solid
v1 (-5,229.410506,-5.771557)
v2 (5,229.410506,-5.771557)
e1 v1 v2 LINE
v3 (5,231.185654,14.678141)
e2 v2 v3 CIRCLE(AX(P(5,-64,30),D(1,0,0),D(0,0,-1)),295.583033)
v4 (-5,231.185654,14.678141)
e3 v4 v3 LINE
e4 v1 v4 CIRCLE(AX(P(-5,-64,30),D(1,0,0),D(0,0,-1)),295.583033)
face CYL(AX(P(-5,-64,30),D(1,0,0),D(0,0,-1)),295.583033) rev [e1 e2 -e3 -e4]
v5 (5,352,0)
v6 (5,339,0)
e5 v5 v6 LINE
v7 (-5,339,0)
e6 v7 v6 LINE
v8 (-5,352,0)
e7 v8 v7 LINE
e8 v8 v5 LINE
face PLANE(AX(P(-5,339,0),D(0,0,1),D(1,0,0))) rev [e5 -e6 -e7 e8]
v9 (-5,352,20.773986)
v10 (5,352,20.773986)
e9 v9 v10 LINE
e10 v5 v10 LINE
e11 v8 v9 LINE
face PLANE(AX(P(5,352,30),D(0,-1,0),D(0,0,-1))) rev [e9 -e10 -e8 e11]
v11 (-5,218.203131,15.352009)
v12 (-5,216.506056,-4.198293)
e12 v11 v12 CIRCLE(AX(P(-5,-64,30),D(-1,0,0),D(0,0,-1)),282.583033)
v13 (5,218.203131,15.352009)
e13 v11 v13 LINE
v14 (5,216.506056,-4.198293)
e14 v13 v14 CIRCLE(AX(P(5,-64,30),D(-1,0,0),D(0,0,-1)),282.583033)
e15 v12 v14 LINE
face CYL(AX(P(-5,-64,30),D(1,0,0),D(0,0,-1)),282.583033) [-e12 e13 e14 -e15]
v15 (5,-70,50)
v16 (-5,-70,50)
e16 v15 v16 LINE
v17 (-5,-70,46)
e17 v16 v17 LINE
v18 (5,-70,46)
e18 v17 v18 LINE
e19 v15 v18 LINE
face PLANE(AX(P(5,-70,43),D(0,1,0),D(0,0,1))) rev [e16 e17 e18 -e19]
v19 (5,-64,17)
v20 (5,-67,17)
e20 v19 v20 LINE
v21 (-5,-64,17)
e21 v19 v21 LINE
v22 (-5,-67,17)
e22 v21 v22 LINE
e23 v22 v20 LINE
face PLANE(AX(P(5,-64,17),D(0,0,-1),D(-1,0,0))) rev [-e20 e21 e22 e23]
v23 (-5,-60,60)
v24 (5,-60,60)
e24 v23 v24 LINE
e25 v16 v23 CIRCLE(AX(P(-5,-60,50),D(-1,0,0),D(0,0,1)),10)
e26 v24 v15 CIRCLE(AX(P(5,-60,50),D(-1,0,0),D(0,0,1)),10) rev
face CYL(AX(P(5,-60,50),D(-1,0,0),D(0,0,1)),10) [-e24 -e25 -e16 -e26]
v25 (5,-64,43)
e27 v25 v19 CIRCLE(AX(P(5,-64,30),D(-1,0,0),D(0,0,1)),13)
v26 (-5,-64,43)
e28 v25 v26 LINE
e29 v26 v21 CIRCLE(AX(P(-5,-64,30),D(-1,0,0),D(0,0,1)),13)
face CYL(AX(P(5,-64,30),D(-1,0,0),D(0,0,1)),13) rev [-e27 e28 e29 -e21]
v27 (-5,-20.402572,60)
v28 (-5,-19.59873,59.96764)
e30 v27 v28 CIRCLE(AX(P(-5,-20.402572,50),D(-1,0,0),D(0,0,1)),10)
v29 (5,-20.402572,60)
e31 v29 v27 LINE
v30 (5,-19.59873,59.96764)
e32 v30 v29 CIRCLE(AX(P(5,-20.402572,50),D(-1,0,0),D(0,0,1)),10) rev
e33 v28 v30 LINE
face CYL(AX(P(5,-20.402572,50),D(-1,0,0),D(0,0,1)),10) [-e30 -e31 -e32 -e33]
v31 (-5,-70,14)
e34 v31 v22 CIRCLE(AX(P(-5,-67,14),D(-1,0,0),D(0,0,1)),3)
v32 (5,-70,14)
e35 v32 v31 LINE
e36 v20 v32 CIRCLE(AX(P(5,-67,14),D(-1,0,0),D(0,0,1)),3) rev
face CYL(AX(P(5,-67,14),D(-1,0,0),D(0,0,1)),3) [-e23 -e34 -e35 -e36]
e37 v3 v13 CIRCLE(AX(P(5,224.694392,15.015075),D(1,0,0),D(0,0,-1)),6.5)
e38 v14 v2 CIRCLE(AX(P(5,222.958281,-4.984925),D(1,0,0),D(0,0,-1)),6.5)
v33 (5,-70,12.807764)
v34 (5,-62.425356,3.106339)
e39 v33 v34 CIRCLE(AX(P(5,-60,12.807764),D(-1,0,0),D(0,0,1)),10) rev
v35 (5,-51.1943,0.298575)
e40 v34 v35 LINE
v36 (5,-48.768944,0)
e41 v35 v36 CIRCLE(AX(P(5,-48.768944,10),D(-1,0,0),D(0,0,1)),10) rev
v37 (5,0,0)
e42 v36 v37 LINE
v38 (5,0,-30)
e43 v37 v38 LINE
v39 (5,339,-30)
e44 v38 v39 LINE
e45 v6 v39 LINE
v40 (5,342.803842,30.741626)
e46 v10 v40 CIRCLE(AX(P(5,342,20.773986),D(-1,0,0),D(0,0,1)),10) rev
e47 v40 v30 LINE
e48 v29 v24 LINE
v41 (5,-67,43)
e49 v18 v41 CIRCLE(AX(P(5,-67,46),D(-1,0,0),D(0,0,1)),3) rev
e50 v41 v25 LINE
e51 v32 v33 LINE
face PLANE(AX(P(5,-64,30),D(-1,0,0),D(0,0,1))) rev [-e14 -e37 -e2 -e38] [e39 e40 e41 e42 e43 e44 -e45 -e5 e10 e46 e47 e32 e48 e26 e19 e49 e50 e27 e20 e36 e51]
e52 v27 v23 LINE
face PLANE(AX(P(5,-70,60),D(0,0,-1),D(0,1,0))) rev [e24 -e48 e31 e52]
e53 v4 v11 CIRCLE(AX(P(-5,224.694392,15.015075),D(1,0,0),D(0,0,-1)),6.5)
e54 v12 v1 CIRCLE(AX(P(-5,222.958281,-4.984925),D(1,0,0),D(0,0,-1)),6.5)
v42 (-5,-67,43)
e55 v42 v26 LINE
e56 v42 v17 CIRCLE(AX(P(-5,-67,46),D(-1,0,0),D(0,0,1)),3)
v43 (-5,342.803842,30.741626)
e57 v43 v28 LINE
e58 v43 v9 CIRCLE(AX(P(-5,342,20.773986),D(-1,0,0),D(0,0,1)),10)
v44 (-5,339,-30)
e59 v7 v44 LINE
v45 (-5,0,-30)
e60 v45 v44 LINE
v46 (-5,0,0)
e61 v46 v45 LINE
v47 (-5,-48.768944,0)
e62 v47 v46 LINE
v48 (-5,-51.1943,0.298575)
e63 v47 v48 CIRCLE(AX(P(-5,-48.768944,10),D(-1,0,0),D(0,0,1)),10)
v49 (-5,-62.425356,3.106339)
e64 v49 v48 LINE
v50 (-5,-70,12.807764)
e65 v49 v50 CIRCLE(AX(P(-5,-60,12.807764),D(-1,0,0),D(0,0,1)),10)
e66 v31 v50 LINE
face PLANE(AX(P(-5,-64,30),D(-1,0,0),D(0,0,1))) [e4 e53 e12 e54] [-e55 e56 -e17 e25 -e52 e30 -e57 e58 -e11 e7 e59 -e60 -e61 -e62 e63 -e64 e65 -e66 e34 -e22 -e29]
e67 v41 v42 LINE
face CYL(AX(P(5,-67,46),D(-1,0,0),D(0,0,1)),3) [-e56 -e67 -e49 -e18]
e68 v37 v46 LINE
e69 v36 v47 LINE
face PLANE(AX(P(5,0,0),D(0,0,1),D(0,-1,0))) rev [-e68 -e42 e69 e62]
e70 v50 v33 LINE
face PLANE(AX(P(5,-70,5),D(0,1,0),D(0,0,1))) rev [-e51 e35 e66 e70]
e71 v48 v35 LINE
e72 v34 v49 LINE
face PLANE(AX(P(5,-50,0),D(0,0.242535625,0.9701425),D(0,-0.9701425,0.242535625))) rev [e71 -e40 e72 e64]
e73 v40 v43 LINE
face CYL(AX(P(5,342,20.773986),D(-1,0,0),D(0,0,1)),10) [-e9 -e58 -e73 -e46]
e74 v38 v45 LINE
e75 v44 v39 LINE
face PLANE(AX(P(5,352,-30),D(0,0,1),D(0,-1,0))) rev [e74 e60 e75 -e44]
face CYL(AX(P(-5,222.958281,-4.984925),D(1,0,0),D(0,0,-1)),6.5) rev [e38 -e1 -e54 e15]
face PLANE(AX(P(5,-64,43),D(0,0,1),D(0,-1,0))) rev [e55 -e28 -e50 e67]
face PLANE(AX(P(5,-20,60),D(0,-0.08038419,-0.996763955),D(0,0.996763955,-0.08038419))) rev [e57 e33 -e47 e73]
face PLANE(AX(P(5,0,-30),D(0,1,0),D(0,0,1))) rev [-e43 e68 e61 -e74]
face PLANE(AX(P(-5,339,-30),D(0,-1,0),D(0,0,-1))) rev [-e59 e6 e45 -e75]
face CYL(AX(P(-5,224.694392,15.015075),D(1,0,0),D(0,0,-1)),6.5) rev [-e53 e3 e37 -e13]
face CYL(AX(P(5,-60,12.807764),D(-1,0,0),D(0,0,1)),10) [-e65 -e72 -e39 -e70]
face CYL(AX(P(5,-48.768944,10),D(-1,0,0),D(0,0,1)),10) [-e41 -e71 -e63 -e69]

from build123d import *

# Parameters (mm, degrees)
BOSS_EXTRUDE1_DEPTH = 5
FILLET1_R           = 10
FILLET2_R           = 3
SKETCH2_W           = 30
SKETCH2_H           = 13
CUT_EXTRUDE1_DEPTH  = 358.217020871
SKETCH3_R           = 6.5
CUT_EXTRUDE2_DEPTH  = 358.217020871
CUT_EXTRUDE3_DEPTH  = 358.217020871


with BuildPart() as part:
    # Sketch1 → Boss-Extrude1 (new, symmetric)
    with BuildSketch(Plane(origin=(0, 0, 0), x_dir=(0, 0, -1), z_dir=(1, 0, 0))):
        with BuildLine():
            Line((30, 0), (0, 0))
            Line((0, 0), (0, -50))
            Line((0, -50), (-5, -70))
            Line((-5, -70), (-17, -70))
            Line((-17, -70), (-17, -64))
            ThreePointArc((-17, -64), (-30, -51), (-43, -64))
            Line((-43, -64), (-43, -70))
            Line((-43, -70), (-60, -70))
            Line((-60, -70), (-60, -20))
            Line((-60, -20), (-30, 352))
            Line((-30, 352), (30, 352))
            Line((30, 352), (30, 0))
        make_face()
    extrude(amount=BOSS_EXTRUDE1_DEPTH, both=True)

    # Fillet1
    # the kernel refuses this fillet: 10 mm, written as the material it takes off along each edge
    with BuildSketch(Plane(origin=(8.07764064, -50, 0), x_dir=(0, -0.9701425001453321, 0.24253562503633222), z_dir=(-1, 0, 0))) as fillet1_piece_1:
        with BuildLine():
            CenterArc((FILLET1_R * 0.123105625618, FILLET1_R), FILLET1_R, 255.963756532, 14.036243468)
            Line((-FILLET1_R * 0.119429999419, FILLET1_R * 0.0298574998547), (0, 0))
            Line((0, 0), (FILLET1_R * 0.123105625618, 0))
        make_face()
    extrude(amount=16.155281281, mode=Mode.SUBTRACT)
    with BuildSketch(Plane(origin=(24.51941016, -70, 5), x_dir=(0, 0, 1), z_dir=(-1, 0, 0))) as fillet1_piece_2:
        with BuildLine():
            CenterArc((FILLET1_R * 0.780776406404, FILLET1_R), FILLET1_R, 194.036243468, 75.963756532)
            Line((-FILLET1_R * 0.189366093741, FILLET1_R * 0.757464374964), (0, 0))
            Line((0, 0), (FILLET1_R * 0.780776406404, 0))
        make_face()
    extrude(amount=49.03882032, mode=Mode.SUBTRACT)
    with BuildSketch(Plane(origin=(30, -70, 60), x_dir=(0, 1, 0), z_dir=(-1, 0, 0))) as fillet1_piece_3:
        with BuildLine():
            CenterArc((FILLET1_R, FILLET1_R), FILLET1_R, 180, 90)
            Line((0, FILLET1_R), (0, 0))
            Line((0, 0), (FILLET1_R, 0))
        make_face()
    extrude(amount=60, mode=Mode.SUBTRACT)
    with BuildSketch(Plane(origin=(6.006430802, -20, 60), x_dir=(0, 0.9967639550118461, -0.08038418992029778), z_dir=(-1, 0, 0))) as fillet1_piece_4:
        with BuildLine():
            CenterArc((FILLET1_R * 0.0402572320672, FILLET1_R), FILLET1_R, 265.389350681, 4.610649319)
            Line((-FILLET1_R * 0.0401269578531, FILLET1_R * 0.00323604498815), (0, 0))
            Line((0, 0), (FILLET1_R * 0.0402572320672, 0))
        make_face()
    extrude(amount=12.012861603, mode=Mode.SUBTRACT)
    with BuildSketch(Plane(origin=(-28.065034742, 352, 30), x_dir=(0, 0, -1), z_dir=(1, 0, 0))) as fillet1_piece_5:
        with BuildLine():
            CenterArc((FILLET1_R * 0.922601389683, -FILLET1_R), FILLET1_R, 90, 85.389350681)
            Line((-FILLET1_R * 0.074162565329, -FILLET1_R * 0.91961581008), (0, 0))
            Line((0, 0), (FILLET1_R * 0.922601389683, 0))
        make_face()
    extrude(amount=56.130069484, mode=Mode.SUBTRACT)

    # Fillet2
    fillet2_edges = [part.edges().sort_by_distance(p)[0] for p in [
        (0, -70, 17),
        (0, -70, 43),
    ]]
    fillet(fillet2_edges, radius=FILLET2_R)

    # Sketch2 → Cut-Extrude1 (cut, through all)
    with BuildSketch(Plane(origin=(5, 0, 0), x_dir=(0, 0, -1), z_dir=(1, 0, 0))):
        with Locations((15, 345.5)):
            Rectangle(SKETCH2_W, SKETCH2_H)
    extrude(amount=-CUT_EXTRUDE1_DEPTH, mode=Mode.SUBTRACT)

    # Sketch3 → Cut-Extrude2 (cut, through all)
    with BuildSketch(Plane(origin=(5, 0, 0), x_dir=(0, 0, -1), z_dir=(1, 0, 0))):
        with Locations((-5, 224)):
            Circle(SKETCH3_R)
    extrude(amount=-CUT_EXTRUDE2_DEPTH, mode=Mode.SUBTRACT)

    # Sketch4 → Cut-Extrude3 (cut, through all)
    with BuildSketch(Plane(origin=(5, 0, 0), x_dir=(0, 0, -1), z_dir=(1, 0, 0))):
        with BuildLine():
            ThreePointArc((5.771557213, 229.410506159), (-4.437877767, 230.475648122), (-14.678140573, 231.185653536))
            ThreePointArc((-14.678140573, 231.185653536), (-21.506336405, 225.031326466), (-15.352009335, 218.203130634))
            ThreePointArc((-15.352009335, 218.203130634), (-5.562122233, 217.524351878), (4.198292879, 216.506055789))
            ThreePointArc((4.198292879, 216.506055789), (11.437150231, 222.171648807), (5.771557213, 229.410506159))
        make_face()
    extrude(amount=-CUT_EXTRUDE3_DEPTH, mode=Mode.SUBTRACT)


solid = part.part
